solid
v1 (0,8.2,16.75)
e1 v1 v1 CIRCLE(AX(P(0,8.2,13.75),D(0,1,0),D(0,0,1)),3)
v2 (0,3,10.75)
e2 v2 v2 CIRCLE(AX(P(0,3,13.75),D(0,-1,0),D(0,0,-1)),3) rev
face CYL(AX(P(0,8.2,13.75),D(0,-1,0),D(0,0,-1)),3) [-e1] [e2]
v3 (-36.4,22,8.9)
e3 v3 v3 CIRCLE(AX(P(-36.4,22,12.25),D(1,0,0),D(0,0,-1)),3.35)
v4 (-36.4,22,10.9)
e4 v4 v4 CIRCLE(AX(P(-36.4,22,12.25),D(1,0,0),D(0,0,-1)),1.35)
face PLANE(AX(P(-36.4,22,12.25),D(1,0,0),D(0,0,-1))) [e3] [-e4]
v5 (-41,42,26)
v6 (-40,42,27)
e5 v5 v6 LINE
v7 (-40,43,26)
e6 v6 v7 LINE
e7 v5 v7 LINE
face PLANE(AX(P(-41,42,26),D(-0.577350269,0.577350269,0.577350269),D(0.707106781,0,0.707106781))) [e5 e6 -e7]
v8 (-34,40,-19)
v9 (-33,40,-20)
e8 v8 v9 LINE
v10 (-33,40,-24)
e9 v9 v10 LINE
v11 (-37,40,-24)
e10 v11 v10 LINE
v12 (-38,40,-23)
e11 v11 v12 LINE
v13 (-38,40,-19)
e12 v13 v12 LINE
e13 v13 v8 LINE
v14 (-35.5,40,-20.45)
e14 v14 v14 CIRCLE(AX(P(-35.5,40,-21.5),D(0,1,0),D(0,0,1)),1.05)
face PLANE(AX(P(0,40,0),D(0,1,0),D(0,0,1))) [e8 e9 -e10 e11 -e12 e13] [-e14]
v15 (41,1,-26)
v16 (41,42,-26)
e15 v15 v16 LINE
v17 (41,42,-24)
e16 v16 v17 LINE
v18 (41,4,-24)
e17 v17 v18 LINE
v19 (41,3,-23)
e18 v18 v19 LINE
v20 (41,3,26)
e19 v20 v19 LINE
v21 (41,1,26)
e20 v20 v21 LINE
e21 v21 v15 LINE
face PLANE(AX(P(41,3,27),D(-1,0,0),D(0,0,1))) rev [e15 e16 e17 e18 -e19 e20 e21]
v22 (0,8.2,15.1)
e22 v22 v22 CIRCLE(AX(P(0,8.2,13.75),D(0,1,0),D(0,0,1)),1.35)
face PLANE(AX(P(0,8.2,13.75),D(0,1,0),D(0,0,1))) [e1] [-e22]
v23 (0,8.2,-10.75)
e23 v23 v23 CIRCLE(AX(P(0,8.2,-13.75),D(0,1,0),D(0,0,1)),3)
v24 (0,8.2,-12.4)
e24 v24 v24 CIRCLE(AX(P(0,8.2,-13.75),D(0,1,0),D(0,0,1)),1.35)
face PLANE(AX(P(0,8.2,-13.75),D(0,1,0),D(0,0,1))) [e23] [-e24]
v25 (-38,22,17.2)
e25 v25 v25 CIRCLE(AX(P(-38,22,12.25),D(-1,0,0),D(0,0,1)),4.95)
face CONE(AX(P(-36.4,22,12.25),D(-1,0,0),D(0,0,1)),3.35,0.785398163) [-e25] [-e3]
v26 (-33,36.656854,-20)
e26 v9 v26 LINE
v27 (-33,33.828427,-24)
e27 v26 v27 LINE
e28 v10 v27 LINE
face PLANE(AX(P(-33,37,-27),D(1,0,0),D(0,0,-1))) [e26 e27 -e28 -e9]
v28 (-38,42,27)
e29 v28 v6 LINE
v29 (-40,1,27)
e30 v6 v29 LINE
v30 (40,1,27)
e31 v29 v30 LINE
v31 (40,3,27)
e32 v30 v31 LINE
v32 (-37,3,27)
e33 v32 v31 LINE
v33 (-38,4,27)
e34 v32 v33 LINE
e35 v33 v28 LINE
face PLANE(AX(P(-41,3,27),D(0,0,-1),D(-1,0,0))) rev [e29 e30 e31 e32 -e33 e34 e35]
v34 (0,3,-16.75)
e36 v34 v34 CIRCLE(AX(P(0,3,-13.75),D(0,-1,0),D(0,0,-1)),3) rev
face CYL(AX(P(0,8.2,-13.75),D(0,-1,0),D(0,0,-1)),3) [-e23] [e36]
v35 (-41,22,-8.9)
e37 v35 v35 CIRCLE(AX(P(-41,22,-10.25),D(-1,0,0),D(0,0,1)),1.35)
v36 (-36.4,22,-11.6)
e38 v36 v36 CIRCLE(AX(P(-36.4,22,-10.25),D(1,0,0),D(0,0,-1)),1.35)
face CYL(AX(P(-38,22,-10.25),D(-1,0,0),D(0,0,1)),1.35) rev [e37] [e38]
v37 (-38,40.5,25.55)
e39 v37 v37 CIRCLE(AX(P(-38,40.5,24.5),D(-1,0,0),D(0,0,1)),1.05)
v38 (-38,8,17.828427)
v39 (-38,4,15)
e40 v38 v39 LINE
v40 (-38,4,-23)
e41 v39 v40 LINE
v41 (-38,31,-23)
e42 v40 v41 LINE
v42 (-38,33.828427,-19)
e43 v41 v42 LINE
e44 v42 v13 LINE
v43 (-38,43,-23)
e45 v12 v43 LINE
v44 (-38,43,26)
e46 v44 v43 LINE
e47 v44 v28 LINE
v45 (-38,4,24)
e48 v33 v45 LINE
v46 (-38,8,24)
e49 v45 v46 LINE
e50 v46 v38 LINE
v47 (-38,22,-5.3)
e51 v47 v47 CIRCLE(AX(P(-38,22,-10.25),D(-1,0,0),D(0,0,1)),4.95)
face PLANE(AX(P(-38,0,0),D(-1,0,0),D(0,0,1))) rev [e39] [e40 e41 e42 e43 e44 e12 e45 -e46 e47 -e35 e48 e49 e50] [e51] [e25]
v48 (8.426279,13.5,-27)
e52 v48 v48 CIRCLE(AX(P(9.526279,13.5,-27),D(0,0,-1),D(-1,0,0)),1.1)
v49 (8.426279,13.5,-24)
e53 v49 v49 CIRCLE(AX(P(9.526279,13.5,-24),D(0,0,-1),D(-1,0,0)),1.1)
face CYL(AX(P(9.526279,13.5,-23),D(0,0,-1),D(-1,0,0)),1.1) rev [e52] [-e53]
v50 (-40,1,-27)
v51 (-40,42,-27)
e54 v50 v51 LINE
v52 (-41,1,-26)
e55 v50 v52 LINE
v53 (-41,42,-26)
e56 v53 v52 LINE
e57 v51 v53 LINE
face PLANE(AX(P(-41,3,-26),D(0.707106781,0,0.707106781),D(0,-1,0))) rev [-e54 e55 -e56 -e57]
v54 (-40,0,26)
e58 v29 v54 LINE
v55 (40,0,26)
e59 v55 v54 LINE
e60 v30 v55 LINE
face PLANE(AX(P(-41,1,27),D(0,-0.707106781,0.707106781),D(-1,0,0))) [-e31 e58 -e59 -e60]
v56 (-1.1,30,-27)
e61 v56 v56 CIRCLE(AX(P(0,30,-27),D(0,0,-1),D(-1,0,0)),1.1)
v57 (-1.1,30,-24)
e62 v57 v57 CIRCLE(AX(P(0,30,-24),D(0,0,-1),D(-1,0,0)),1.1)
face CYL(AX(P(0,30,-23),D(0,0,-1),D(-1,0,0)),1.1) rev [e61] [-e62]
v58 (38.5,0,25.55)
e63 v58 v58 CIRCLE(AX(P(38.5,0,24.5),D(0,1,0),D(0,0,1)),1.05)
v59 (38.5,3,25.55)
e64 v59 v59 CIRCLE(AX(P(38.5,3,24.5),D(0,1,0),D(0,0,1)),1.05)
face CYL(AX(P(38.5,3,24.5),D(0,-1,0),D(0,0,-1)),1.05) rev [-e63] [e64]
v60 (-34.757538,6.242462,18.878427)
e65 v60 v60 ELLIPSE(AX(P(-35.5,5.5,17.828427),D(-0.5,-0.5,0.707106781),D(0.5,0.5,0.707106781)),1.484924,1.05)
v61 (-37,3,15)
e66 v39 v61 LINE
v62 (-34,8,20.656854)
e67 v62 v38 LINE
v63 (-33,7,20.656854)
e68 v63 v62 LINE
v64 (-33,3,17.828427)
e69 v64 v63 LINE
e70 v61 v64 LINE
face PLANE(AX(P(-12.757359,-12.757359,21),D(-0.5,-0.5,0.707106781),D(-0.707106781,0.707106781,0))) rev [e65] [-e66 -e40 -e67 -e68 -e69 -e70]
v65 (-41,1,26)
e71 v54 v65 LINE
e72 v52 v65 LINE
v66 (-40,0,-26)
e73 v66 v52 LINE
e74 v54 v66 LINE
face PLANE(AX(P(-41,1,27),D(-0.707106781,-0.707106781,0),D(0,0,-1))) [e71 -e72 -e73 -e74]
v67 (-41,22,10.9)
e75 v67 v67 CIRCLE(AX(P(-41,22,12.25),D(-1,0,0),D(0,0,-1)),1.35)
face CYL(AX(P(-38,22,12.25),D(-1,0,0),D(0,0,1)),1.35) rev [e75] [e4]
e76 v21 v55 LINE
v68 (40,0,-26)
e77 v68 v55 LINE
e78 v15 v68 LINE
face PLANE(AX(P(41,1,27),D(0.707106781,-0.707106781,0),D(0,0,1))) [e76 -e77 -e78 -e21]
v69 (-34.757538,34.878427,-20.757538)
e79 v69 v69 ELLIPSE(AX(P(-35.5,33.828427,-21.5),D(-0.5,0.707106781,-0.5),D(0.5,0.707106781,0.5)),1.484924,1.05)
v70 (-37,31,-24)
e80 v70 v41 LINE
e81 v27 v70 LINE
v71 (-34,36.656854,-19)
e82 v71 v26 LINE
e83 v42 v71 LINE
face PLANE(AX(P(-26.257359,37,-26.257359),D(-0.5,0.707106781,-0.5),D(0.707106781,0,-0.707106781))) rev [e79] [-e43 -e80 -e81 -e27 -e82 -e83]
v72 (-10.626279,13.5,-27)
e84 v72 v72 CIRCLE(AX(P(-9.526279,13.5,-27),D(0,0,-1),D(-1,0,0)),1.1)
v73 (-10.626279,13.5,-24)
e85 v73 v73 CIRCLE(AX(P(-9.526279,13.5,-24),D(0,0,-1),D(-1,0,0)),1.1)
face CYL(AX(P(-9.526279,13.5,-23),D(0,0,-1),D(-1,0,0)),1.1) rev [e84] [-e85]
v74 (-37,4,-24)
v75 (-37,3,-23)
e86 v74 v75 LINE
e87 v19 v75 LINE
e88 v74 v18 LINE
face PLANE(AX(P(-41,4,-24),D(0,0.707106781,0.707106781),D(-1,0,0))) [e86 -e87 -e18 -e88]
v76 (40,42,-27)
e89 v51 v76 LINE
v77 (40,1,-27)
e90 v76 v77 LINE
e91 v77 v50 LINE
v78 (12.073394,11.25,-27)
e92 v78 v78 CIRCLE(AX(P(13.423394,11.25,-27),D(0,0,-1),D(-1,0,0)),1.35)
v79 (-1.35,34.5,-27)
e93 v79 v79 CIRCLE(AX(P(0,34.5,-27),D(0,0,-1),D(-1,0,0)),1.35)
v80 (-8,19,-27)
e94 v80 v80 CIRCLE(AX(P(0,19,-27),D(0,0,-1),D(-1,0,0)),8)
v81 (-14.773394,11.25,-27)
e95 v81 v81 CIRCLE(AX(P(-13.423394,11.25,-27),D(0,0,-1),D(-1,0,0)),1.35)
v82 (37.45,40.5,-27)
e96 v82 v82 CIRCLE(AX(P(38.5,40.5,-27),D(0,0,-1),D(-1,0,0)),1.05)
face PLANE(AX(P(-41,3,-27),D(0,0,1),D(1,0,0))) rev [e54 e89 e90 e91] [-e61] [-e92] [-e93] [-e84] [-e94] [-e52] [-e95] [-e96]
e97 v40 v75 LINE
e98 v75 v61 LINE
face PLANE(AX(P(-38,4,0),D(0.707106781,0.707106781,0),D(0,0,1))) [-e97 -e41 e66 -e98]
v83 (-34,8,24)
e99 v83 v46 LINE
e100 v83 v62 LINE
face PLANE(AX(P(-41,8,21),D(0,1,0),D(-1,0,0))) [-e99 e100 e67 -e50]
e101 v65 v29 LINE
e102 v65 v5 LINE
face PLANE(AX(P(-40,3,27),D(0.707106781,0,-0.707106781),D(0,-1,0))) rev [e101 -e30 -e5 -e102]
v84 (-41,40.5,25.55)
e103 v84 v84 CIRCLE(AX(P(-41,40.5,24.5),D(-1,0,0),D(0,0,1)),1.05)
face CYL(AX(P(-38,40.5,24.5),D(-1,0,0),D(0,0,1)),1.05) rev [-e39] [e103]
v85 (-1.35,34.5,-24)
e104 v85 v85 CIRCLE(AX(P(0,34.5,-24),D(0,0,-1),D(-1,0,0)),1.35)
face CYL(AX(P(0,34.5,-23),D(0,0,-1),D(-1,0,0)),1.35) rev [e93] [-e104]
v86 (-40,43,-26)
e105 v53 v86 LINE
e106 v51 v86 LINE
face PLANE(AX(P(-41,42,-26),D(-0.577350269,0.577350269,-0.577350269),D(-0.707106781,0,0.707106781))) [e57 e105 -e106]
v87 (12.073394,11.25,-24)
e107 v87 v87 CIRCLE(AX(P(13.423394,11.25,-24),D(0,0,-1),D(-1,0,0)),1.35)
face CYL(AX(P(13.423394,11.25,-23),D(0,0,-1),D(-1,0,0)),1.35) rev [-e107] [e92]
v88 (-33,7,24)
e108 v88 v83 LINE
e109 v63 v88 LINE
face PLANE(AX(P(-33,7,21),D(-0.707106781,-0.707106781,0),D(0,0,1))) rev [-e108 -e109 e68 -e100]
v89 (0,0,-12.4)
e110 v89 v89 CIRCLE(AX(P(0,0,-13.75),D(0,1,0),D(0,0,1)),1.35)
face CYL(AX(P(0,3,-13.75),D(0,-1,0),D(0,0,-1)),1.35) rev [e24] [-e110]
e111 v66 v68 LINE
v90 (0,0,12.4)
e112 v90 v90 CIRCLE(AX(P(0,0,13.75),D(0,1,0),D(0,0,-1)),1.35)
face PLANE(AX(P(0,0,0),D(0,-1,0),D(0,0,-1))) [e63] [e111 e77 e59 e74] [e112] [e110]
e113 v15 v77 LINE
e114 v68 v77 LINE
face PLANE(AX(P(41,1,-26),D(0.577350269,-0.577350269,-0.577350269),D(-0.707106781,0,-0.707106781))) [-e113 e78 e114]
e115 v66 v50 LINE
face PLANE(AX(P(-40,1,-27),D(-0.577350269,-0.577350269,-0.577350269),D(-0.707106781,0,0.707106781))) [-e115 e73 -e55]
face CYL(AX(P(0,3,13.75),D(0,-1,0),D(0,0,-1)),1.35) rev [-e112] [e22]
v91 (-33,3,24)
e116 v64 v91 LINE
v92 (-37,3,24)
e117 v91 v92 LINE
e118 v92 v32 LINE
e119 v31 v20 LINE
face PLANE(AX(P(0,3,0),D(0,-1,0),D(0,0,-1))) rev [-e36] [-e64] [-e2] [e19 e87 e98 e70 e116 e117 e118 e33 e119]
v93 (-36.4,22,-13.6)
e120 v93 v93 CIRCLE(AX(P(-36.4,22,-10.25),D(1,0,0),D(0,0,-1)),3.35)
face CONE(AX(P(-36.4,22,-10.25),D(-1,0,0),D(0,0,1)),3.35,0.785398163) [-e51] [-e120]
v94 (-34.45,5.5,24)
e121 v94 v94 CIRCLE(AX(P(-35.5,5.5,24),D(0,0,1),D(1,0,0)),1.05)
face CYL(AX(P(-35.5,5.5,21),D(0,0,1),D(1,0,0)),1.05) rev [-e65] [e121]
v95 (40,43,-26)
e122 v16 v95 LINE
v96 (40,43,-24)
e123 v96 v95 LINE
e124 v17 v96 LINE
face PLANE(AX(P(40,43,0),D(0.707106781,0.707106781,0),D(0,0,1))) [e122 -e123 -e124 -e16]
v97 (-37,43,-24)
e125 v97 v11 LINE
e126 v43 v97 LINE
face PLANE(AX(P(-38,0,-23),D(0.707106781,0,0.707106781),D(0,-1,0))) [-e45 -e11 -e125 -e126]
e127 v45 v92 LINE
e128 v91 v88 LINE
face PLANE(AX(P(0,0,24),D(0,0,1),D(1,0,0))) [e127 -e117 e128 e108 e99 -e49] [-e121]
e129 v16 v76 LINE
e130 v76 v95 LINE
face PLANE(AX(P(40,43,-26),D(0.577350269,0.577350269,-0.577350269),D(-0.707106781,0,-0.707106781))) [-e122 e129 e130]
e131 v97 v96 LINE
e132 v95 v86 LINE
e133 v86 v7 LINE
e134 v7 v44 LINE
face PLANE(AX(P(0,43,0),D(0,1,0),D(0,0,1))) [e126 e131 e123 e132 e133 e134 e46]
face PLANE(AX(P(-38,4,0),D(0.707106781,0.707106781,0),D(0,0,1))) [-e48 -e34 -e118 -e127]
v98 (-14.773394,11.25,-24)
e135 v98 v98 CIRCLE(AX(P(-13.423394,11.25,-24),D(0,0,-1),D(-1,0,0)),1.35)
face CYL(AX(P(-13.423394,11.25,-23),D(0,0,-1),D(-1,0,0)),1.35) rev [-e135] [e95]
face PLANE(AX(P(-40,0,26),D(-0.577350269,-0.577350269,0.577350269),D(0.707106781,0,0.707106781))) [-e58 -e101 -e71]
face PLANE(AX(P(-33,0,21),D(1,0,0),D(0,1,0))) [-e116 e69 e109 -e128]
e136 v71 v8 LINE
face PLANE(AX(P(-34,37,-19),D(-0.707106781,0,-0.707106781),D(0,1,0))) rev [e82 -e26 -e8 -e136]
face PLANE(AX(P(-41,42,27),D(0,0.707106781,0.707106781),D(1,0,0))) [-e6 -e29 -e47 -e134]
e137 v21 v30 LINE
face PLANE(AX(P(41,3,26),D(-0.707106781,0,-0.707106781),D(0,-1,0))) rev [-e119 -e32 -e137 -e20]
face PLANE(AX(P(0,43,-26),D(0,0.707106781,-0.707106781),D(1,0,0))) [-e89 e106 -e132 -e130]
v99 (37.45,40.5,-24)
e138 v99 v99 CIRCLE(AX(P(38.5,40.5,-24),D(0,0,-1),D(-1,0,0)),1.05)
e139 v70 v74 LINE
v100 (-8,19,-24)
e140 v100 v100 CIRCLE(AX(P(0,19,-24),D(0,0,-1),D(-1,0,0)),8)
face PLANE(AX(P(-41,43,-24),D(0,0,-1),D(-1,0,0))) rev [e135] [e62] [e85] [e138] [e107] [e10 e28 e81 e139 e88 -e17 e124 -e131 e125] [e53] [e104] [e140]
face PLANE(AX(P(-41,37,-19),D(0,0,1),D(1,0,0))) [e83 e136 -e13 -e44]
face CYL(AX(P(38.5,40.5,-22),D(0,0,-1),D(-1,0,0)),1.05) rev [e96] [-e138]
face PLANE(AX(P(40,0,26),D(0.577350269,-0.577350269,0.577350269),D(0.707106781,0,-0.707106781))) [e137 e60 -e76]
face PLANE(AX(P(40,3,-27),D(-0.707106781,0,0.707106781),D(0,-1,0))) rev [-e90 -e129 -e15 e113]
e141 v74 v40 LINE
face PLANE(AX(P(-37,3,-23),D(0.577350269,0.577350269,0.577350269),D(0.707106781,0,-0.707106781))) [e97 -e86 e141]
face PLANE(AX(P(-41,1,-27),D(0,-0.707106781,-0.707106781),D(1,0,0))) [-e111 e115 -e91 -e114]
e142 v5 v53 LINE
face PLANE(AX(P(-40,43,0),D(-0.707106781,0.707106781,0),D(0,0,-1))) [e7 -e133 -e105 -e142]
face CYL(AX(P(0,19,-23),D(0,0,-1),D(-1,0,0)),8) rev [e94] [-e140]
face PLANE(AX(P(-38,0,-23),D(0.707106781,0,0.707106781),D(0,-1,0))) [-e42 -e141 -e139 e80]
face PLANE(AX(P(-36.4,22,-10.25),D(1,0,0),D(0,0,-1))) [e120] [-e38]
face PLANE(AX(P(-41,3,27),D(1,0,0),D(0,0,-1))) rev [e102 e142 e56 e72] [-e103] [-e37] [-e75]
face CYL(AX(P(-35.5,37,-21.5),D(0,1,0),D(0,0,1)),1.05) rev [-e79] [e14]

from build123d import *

# Parameters (mm, degrees)
SKETCH_2_W          = 82
SKETCH_2_H          = 54
SKETCH_2_R          = 1.35
SKETCH_2_R_2        = 1.05
EXTRUDE_1_DEPTH     = 3
SKETCH_3_R          = 3
SKETCH_3_R_2        = 1.35
EXTRUDE_2_DEPTH     = 5.2
SKETCH_4_W          = 82
SKETCH_4_H          = 3
EXTRUDE_3_DEPTH     = 40
SKETCH_5_R          = 1.35
SKETCH_5_R_2        = 1.1
SKETCH_5_R_3        = 8
CUT_EXTRUDE_1_DEPTH = 4
SKETCH_6_W          = 54
SKETCH_6_H          = 43
SKETCH_6_R          = 1.35
SKETCH_6_R_2        = 1.05
EXTRUDE_4_DEPTH     = 3
SKETCH_7_R          = 3.35
SKETCH_7_R_2        = 1.35
EXTRUDE_5_DEPTH     = 1.6
SKETCH_8_W          = 8
SKETCH_8_H          = 8
SKETCH_8_R          = 1.05
EXTRUDE_6_DEPTH     = 3
SKETCH_9_W          = 8
SKETCH_9_H          = 8
SKETCH_9_R          = 1.05
EXTRUDE_7_DEPTH     = 3
SKETCH_11_R         = 1.05
CUT_EXTRUDE_2_DEPTH = 5
CHAMFER_1_SIZE      = 1
CHAMFER_2_SIZE      = 6
CHAMFER_3_SIZE      = 1.6


# Some blends are built 0.0001 mm under size
with BuildPart() as part:
    # 草图2 → 凸台-拉伸1 (new body)
    with BuildSketch(Plane(origin=(0, 0, 0), x_dir=(1, 0, 0), z_dir=(0, 1, 0))):
        Rectangle(SKETCH_2_W, SKETCH_2_H)
        with Locations(Location((0, 13.75, 0), (0, 0, 270))):
            Circle(SKETCH_2_R, mode=Mode.SUBTRACT)
        with Locations(Location((0, -13.75, 0), (0, 0, 90))):
            Circle(SKETCH_2_R, mode=Mode.SUBTRACT)
        with Locations(Location((38.5, -24.5, 0), (0, 0, 270))):
            Circle(SKETCH_2_R_2, mode=Mode.SUBTRACT)
    extrude(amount=EXTRUDE_1_DEPTH)

    # 草图3 → 凸台-拉伸2 (add)
    # profile 1 of 2: a face of its own
    with BuildSketch(Plane(origin=(0, 3, 0), x_dir=(1, 0, 0), z_dir=(0, 1, 0))):
        with Locations(Location((0, 13.75, 0), (0, 0, 90))):
            Circle(SKETCH_3_R)
        with Locations(Location((0, 13.75, 0), (0, 0, 270))):
            Circle(SKETCH_3_R_2, mode=Mode.SUBTRACT)
    # profile 2 of 2: a face of its own
    with BuildSketch(Plane(origin=(0, 3, 0), x_dir=(1, 0, 0), z_dir=(0, 1, 0))):
        with Locations(Location((0, -13.75, 0), (0, 0, 90))):
            Circle(SKETCH_3_R)
        with Locations(Location((0, -13.75, 0), (0, 0, 90))):
            Circle(SKETCH_3_R_2, mode=Mode.SUBTRACT)
    extrude(amount=EXTRUDE_2_DEPTH)

    # 草图4 → 凸台-拉伸3 (add)
    with BuildSketch(Plane(origin=(0, 3, 0), x_dir=(1, 0, 0), z_dir=(0, 1, 0))):
        with Locations((0, 25.5)):
            Rectangle(SKETCH_4_W, SKETCH_4_H)
    extrude(amount=EXTRUDE_3_DEPTH)

    # 草图5 → 切除-拉伸1 (cut)
    with BuildSketch(Plane(origin=(0, 0, -27), x_dir=(-1, 0, 0), z_dir=(0, 0, -1))):
        with Locations((-13.423393759, 11.25)):
            Circle(SKETCH_5_R)
        with Locations((-9.526279442, 13.5)):
            Circle(SKETCH_5_R_2)
        with Locations((13.423393759, 11.25)):
            Circle(SKETCH_5_R)
        with Locations((9.526279442, 13.5)):
            Circle(SKETCH_5_R_2)
        with Locations((0, 30)):
            Circle(SKETCH_5_R_2)
        with Locations((0, 34.5)):
            Circle(SKETCH_5_R)
        with Locations((0, 19)):
            Circle(SKETCH_5_R_3)
    extrude(amount=-CUT_EXTRUDE_1_DEPTH, mode=Mode.SUBTRACT)

    # 草图6 → 凸台-拉伸4 (add)
    with BuildSketch(Plane.ZY.offset(41)):
        with Locations((0, 21.5)):
            Rectangle(SKETCH_6_W, SKETCH_6_H)
        with Locations((-10.25, 22)):
            Circle(SKETCH_6_R, mode=Mode.SUBTRACT)
        with Locations(Location((12.25, 22, 0), (0, 0, 180))):
            Circle(SKETCH_6_R, mode=Mode.SUBTRACT)
        with Locations((24.5, 40.5)):
            Circle(SKETCH_6_R_2, mode=Mode.SUBTRACT)
    extrude(amount=-EXTRUDE_4_DEPTH)

    # 草图7 → 凸台-拉伸5 (add)
    # profile 1 of 2: a face of its own
    with BuildSketch(Plane(origin=(-38, 0, 0), x_dir=(0, 0, -1), z_dir=(1, 0, 0))):
        with Locations(Location((-12.25, 22, 0), (0, 0, 180))):
            Circle(SKETCH_7_R)
        with Locations((-12.25, 22)):
            Circle(SKETCH_7_R_2, mode=Mode.SUBTRACT)
    # profile 2 of 2: a face of its own
    with BuildSketch(Plane(origin=(-38, 0, 0), x_dir=(0, 0, -1), z_dir=(1, 0, 0))):
        with Locations(Location((10.25, 22, 0), (0, 0, 180))):
            Circle(SKETCH_7_R)
        with Locations(Location((10.25, 22, 0), (0, 0, 180))):
            Circle(SKETCH_7_R_2, mode=Mode.SUBTRACT)
    extrude(amount=EXTRUDE_5_DEPTH)

    # 草图8 → 凸台-拉伸6 (add)
    with BuildSketch(Plane(origin=(0, 40, 0), x_dir=(1, 0, 0), z_dir=(0, 1, 0))):
        with Locations((-37, 23)):
            Rectangle(SKETCH_8_W, SKETCH_8_H)
        with Locations(Location((-35.5, 21.5, 0), (0, 0, 270))):
            Circle(SKETCH_8_R, mode=Mode.SUBTRACT)
    extrude(amount=-EXTRUDE_6_DEPTH)

    # 草图9 → 凸台-拉伸7 (add)
    with BuildSketch(Plane.XY.offset(24)):
        with Locations((-37, 4)):
            Rectangle(SKETCH_9_W, SKETCH_9_H)
        with Locations((-35.5, 5.5)):
            Circle(SKETCH_9_R, mode=Mode.SUBTRACT)
    extrude(amount=-EXTRUDE_7_DEPTH)

    # 草图11 → 切除-拉伸2 (cut)
    with BuildSketch(Plane(origin=(0, 0, -27), x_dir=(-1, 0, 0), z_dir=(0, 0, -1))):
        with Locations((-38.5, 40.5)):
            Circle(SKETCH_11_R)
    extrude(amount=-CUT_EXTRUDE_2_DEPTH, mode=Mode.SUBTRACT)

    # 倒角1
    chamfer_1_edges = [part.edges().sort_by_distance(p)[0] for p in [
        (-38, 41.5, -24),
        (-33, 38.5, -19),
        (-38, 3, -1.5),
        (-33, 8, 22.5),
        (-41, 43, 0),
        (41, 43, -25.5),
        (0, 43, -27),
        (0, 0, 27),
        (-41, 0, 0),
        (0, 0, -27),
        (41, 0, 0),
        (41, 1.5, 27),
        (-41, 21.5, 27),
        (-41, 21.5, -27),
        (41, 21.5, -27),
        (1.5, 3, -24),
        (-39.5, 43, 27),
        (-38, 3, 25.5),
        (-38, 20, -24),
    ]]
    chamfer(chamfer_1_edges, length=CHAMFER_1_SIZE)

    # 倒角2
    # the kernel refuses this chamfer: 6 mm, written as the material it adds along each edge
    with BuildSketch(Plane(origin=(-48.910726879, 37, -12.089273121), x_dir=(0.7068394360706733, 0.027495876610586785, 0.7068394360706736), z_dir=(0.7071067811865476, 0, -0.7071067811865476))) as chamfer_2_piece_1_section:
        Polygon((CHAMFER_2_SIZE * 0.999621916911, CHAMFER_2_SIZE * 0.0274958766106), (-CHAMFER_2_SIZE * 0.0274958766106, CHAMFER_2_SIZE * 0.999621916911), (0, 0), align=None)
    chamfer_2_piece_1 = extrude(amount=32.274409418, mode=Mode.PRIVATE)
    chamfer_2_piece_1 = split(chamfer_2_piece_1, bisect_by=Plane(origin=(-34.186783964, 35.742495362, -19), z_dir=(0, 0, -1)), keep=Keep.TOP, mode=Mode.PRIVATE)
    chamfer_2_piece_1 = split(chamfer_2_piece_1, bisect_by=Plane(origin=(-41, 35.742495362, -20.186783964), z_dir=(1, 0, 0)), keep=Keep.TOP, mode=Mode.PRIVATE)
    chamfer_2_piece_1 = split(chamfer_2_piece_1, bisect_by=Plane(origin=(-33, 35.742495362, -20.186783964), z_dir=(-1, 0, 0)), keep=Keep.TOP, mode=Mode.PRIVATE)
    chamfer_2_piece_1 = split(chamfer_2_piece_1, bisect_by=Plane(origin=(-33.5, 35.742495362, -19.5), z_dir=(-0.7071067811865476, 0, -0.7071067811865476)), keep=Keep.TOP, mode=Mode.PRIVATE)
    chamfer_2_piece_1 = chamfer_2_piece_1 - Plane(origin=(-35.5, 35.742495362, -21.5), x_dir=(0, 0, 1), z_dir=(0, 1, 0)) * Cylinder(1.05, 89, mode=Mode.PRIVATE)
    chamfer_2_piece_1 = split(chamfer_2_piece_1, bisect_by=Plane(origin=(-34.186783964, 35.742495362, -27), z_dir=(0, 0, 1)), keep=Keep.TOP, mode=Mode.PRIVATE)
    add(chamfer_2_piece_1)
    with BuildSketch(Plane(origin=(-48.910726879, 14.910726879, 21), x_dir=(0.7068394360706735, 0.7068394360706735, 0.027495876610586212), z_dir=(0.7071067811865476, -0.7071067811865476, 0))) as chamfer_2_piece_2_section:
        Polygon((CHAMFER_2_SIZE * 0.999621916911, -CHAMFER_2_SIZE * 0.0274958766106), (-CHAMFER_2_SIZE * 0.0274958766106, -CHAMFER_2_SIZE * 0.999621916911), (0, 0), align=None)
    chamfer_2_piece_2 = extrude(amount=32.274409418, mode=Mode.PRIVATE)
    chamfer_2_piece_2 = split(chamfer_2_piece_2, bisect_by=Plane(origin=(-34.186783964, 8, 19.742495362), z_dir=(0, -1, 0)), keep=Keep.TOP, mode=Mode.PRIVATE)
    chamfer_2_piece_2 = split(chamfer_2_piece_2, bisect_by=Plane(origin=(-41, 6.813216036, 19.742495362), z_dir=(1, 0, 0)), keep=Keep.TOP, mode=Mode.PRIVATE)
    chamfer_2_piece_2 = split(chamfer_2_piece_2, bisect_by=Plane(origin=(-33, 6.813216036, 19.742495362), z_dir=(-1, 0, 0)), keep=Keep.TOP, mode=Mode.PRIVATE)
    chamfer_2_piece_2 = split(chamfer_2_piece_2, bisect_by=Plane(origin=(-34.186783964, 0, 19.742495362), z_dir=(0, 1, 0)), keep=Keep.TOP, mode=Mode.PRIVATE)
    chamfer_2_piece_2 = split(chamfer_2_piece_2, bisect_by=Plane(origin=(-33.5, 7.5, 19.742495362), z_dir=(-0.7071067811865438, -0.7071067811865512, 0)), keep=Keep.TOP, mode=Mode.PRIVATE)
    chamfer_2_piece_2 = chamfer_2_piece_2 - Plane(origin=(-35.5, 5.5, 19.742495362), x_dir=(1, 0, 0), z_dir=(0, 0, 1)) * Cylinder(1.05, 89, mode=Mode.PRIVATE)
    add(chamfer_2_piece_2)

    # 倒角3
    chamfer_3_edges = [part.edges().sort_by_distance(p)[0] for p in [
        (-38, 22, 8.9),
        (-38, 22, -13.6),
    ]]
    chamfer(chamfer_3_edges, length=CHAMFER_3_SIZE - 0.0001)  # a hair under: the kernel refuses the full size


solid = part.part
